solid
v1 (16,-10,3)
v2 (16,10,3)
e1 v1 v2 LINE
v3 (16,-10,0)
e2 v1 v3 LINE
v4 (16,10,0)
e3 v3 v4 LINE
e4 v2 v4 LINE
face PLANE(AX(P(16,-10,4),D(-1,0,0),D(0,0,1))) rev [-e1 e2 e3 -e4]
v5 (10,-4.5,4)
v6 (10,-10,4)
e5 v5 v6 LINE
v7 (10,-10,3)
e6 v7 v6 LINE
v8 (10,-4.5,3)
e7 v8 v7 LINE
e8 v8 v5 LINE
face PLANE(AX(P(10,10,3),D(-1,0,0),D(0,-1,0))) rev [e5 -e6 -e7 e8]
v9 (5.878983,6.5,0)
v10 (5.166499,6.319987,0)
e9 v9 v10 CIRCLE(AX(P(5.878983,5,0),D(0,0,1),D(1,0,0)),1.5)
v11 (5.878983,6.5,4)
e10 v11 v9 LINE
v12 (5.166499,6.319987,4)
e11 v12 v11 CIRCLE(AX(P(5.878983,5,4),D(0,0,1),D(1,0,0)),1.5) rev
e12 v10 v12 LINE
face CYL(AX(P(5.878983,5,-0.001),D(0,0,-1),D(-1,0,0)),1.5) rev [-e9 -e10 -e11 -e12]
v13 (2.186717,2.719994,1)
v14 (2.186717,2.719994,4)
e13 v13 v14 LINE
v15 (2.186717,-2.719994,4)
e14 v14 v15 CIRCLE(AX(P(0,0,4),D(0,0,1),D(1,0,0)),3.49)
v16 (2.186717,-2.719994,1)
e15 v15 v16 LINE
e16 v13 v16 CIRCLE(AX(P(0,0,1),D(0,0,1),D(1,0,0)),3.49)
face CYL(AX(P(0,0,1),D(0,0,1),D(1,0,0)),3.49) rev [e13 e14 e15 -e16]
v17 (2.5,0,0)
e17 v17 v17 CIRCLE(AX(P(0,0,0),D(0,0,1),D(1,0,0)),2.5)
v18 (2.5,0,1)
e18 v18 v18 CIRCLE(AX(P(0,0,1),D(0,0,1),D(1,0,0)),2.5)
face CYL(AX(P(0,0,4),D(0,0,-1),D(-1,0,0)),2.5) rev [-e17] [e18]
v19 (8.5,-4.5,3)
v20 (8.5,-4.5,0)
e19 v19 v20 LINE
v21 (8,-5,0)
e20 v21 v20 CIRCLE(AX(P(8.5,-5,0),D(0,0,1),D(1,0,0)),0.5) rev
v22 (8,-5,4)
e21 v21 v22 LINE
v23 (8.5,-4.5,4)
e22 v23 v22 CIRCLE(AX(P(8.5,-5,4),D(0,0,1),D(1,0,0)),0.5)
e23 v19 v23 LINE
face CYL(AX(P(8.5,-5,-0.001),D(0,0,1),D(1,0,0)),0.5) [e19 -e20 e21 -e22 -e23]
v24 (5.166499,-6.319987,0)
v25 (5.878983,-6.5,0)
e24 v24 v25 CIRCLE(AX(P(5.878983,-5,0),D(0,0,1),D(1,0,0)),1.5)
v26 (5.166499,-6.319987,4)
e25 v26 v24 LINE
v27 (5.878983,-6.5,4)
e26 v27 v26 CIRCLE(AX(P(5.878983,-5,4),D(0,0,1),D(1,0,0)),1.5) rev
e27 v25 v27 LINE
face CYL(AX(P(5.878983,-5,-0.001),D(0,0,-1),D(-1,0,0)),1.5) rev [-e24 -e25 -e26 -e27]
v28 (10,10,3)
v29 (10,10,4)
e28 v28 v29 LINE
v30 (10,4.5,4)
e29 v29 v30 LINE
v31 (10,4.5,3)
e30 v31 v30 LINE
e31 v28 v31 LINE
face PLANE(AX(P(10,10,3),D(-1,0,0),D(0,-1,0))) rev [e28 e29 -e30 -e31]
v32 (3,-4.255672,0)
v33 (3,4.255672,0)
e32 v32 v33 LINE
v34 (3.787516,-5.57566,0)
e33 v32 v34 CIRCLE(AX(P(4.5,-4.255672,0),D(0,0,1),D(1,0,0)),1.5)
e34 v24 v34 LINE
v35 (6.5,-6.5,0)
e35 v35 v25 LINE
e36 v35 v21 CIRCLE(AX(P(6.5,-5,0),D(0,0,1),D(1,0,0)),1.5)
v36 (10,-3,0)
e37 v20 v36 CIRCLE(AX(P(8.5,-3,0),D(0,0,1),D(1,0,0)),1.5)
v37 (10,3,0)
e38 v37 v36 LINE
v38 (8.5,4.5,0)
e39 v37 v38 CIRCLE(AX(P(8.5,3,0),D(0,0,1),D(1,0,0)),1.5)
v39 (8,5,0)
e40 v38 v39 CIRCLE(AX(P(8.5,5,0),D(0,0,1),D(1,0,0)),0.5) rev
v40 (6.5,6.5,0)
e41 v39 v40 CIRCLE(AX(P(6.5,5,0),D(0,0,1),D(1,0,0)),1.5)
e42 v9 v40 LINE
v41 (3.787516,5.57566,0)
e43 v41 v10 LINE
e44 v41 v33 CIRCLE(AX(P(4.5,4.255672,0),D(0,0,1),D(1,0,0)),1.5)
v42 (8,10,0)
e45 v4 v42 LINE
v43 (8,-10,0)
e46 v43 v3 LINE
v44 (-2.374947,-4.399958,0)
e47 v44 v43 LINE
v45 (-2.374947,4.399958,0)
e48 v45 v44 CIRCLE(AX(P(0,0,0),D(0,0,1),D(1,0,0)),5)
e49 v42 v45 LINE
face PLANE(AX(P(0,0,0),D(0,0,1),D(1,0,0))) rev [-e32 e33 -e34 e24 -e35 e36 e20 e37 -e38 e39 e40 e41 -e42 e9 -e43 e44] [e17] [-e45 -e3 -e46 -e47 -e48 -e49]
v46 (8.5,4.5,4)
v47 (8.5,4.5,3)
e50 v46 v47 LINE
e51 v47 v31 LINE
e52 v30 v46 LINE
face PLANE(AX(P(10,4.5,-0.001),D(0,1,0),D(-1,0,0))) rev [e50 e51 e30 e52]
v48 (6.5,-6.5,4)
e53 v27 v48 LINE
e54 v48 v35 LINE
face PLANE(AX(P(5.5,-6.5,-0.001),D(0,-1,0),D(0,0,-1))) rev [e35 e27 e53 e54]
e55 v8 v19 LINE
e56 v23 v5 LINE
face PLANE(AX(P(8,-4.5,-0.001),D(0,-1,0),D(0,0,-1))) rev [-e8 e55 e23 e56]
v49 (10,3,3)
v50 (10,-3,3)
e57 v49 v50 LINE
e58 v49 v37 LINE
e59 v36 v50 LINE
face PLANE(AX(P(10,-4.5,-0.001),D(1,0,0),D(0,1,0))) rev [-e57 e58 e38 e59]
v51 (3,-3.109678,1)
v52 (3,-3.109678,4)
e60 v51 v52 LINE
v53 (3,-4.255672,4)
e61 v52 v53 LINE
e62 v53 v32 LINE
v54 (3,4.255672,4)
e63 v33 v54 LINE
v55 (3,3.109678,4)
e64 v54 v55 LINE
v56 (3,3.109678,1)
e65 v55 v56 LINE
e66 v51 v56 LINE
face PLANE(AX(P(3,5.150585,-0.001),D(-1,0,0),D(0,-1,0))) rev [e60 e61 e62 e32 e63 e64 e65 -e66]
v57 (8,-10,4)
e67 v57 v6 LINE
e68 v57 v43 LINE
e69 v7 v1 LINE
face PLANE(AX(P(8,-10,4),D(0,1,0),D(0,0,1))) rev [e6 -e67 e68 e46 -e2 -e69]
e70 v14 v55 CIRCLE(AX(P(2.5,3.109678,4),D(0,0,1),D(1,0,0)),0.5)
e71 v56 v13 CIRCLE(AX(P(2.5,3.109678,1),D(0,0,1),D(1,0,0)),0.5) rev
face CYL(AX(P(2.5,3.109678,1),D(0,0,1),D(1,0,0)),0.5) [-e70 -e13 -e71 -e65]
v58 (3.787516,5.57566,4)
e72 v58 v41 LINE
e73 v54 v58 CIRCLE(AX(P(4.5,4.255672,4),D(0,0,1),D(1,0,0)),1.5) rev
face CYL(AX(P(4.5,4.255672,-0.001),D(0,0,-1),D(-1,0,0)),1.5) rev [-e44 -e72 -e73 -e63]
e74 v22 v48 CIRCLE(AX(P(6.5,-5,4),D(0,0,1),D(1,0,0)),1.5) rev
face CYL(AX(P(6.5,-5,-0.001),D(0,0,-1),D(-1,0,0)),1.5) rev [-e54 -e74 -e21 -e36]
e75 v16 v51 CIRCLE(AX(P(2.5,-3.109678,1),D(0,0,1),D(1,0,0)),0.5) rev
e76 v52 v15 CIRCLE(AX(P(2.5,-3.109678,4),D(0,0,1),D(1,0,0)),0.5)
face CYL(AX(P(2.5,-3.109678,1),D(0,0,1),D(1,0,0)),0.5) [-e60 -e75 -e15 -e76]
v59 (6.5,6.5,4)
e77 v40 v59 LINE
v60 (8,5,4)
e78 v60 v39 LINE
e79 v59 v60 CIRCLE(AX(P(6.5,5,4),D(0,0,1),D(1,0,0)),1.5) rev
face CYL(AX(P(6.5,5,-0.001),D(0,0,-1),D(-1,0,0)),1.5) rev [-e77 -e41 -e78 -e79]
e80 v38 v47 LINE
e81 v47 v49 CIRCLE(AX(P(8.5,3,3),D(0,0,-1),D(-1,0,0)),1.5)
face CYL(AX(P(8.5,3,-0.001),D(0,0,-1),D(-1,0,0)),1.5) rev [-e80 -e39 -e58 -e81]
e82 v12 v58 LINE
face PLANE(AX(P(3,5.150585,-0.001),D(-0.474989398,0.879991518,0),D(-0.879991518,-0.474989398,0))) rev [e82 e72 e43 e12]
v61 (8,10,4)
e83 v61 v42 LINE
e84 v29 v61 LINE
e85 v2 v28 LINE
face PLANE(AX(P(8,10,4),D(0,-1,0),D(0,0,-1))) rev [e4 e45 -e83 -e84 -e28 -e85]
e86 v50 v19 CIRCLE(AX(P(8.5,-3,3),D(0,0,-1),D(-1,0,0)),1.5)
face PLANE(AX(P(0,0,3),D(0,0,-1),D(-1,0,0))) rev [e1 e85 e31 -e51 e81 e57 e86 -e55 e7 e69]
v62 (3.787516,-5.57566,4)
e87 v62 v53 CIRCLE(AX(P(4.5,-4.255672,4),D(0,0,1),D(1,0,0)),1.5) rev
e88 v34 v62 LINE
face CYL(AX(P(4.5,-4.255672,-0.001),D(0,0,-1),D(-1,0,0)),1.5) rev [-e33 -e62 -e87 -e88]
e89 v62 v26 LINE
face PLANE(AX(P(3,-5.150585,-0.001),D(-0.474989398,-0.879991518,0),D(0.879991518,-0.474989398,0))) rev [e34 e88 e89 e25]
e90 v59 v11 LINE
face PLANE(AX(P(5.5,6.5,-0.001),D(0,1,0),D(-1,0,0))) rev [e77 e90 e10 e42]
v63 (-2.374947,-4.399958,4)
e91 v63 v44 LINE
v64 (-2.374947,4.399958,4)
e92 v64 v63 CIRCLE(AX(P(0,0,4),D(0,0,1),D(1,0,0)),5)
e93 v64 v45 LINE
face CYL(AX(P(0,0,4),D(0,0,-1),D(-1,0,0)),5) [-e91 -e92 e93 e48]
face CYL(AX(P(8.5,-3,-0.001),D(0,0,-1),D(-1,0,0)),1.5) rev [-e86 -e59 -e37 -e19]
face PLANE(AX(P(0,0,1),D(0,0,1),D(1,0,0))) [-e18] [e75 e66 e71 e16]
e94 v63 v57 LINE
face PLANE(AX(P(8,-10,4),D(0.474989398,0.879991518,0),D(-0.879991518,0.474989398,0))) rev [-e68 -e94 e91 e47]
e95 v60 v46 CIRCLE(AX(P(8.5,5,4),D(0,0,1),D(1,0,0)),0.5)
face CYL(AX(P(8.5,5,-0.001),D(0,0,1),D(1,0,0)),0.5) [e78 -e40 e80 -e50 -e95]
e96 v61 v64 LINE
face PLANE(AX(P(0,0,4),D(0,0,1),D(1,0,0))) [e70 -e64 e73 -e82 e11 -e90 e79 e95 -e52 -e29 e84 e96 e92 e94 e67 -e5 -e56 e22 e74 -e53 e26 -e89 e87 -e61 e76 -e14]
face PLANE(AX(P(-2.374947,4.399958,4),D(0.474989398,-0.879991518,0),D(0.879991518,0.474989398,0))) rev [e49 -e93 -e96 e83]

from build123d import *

# Parameters (mm, degrees)
SKETCH1_R           = 2.5
BOSS_EXTRUDE1_DEPTH = 4
SKETCH4_R           = 3.49
CUT_EXTRUDE1_DEPTH  = 3
SKETCH5_W           = 6
SKETCH5_H           = 20
CUT_EXTRUDE2_DEPTH  = 1
CUT_EXTRUDE3_REACH  = 21.287
FILLET1_R           = 0.5
FILLET2_R           = 1.5
FILLET3_R           = 0.5


with BuildPart() as part:
    # Sketch1 → Boss-Extrude1 (new body)
    with BuildSketch(Plane.XY):
        with BuildLine():
            Line((-2.374946989, 4.399957591), (8, 10))
            Line((8, 10), (16, 10))
            Line((16, 10), (16, -10))
            Line((16, -10), (8, -10))
            Line((8, -10), (-2.374946989, -4.399957591))
            ThreePointArc((-2.374946989, -4.399957591), (-5, 0), (-2.374946989, 4.399957591))
        make_face()
        Circle(SKETCH1_R, mode=Mode.SUBTRACT)
    extrude(amount=BOSS_EXTRUDE1_DEPTH)

    # Sketch4 → Cut-Extrude1 (cut)
    with BuildSketch(Plane.XY.offset(4)):
        Circle(SKETCH4_R)
    extrude(amount=-CUT_EXTRUDE1_DEPTH, mode=Mode.SUBTRACT)

    # Sketch5 → Cut-Extrude2 (cut)
    with BuildSketch(Plane.XY.offset(4)):
        with Locations((13, 0)):
            Rectangle(SKETCH5_W, SKETCH5_H)
    extrude(amount=-CUT_EXTRUDE2_DEPTH, mode=Mode.SUBTRACT)

    # Sketch6 → Cut-Extrude3 (cut, up to next)
    with BuildSketch(Plane.XY.offset(4), mode=Mode.PRIVATE) as cut_extrude3_sk1:
        Polygon((3, 5.150585296), (5.5, 6.5), (8, 6.5), (8, 4.5), (10, 4.5), (10, -4.5), (8, -4.5), (8, -6.5), (5.5, -6.5), (3, -5.150585296), align=None)
    cut_extrude3_tool1 = extrude(cut_extrude3_sk1.sketch, amount=-CUT_EXTRUDE3_REACH, mode=Mode.PRIVATE) & part.part
    add(cut_extrude3_tool1.solids().sort_by_distance((6.361806, 0, 4))[0], mode=Mode.SUBTRACT)

    # Fillet1
    fillet1_edges = [part.edges().sort_by_distance(p)[0] for p in [
        (3, -1.783283488, 2.5),
        (3, 1.783283488, 2.5),
    ]]
    fillet(fillet1_edges, radius=FILLET1_R)

    # Fillet2
    fillet2_edges = [part.edges().sort_by_distance(p)[0] for p in [
        (10, 4.5, 1.5),
        (3, -5.150585296, 2),
        (3, 5.150585296, 2),
        (5.5, 6.5, 2),
        (8, 6.5, 2),
        (10, -4.5, 1.5),
        (8, -6.5, 2),
        (5.5, -6.5, 2),
    ]]
    fillet(fillet2_edges, radius=FILLET2_R)

    # Fillet3
    fillet3_edges = [part.edges().sort_by_distance(p)[0] for p in [
        (8, -4.5, 2),
        (8, 4.5, 2),
    ]]
    fillet(fillet3_edges, radius=FILLET3_R - 0.0001)  # a hair under: the kernel refuses the full size


solid = part.part
